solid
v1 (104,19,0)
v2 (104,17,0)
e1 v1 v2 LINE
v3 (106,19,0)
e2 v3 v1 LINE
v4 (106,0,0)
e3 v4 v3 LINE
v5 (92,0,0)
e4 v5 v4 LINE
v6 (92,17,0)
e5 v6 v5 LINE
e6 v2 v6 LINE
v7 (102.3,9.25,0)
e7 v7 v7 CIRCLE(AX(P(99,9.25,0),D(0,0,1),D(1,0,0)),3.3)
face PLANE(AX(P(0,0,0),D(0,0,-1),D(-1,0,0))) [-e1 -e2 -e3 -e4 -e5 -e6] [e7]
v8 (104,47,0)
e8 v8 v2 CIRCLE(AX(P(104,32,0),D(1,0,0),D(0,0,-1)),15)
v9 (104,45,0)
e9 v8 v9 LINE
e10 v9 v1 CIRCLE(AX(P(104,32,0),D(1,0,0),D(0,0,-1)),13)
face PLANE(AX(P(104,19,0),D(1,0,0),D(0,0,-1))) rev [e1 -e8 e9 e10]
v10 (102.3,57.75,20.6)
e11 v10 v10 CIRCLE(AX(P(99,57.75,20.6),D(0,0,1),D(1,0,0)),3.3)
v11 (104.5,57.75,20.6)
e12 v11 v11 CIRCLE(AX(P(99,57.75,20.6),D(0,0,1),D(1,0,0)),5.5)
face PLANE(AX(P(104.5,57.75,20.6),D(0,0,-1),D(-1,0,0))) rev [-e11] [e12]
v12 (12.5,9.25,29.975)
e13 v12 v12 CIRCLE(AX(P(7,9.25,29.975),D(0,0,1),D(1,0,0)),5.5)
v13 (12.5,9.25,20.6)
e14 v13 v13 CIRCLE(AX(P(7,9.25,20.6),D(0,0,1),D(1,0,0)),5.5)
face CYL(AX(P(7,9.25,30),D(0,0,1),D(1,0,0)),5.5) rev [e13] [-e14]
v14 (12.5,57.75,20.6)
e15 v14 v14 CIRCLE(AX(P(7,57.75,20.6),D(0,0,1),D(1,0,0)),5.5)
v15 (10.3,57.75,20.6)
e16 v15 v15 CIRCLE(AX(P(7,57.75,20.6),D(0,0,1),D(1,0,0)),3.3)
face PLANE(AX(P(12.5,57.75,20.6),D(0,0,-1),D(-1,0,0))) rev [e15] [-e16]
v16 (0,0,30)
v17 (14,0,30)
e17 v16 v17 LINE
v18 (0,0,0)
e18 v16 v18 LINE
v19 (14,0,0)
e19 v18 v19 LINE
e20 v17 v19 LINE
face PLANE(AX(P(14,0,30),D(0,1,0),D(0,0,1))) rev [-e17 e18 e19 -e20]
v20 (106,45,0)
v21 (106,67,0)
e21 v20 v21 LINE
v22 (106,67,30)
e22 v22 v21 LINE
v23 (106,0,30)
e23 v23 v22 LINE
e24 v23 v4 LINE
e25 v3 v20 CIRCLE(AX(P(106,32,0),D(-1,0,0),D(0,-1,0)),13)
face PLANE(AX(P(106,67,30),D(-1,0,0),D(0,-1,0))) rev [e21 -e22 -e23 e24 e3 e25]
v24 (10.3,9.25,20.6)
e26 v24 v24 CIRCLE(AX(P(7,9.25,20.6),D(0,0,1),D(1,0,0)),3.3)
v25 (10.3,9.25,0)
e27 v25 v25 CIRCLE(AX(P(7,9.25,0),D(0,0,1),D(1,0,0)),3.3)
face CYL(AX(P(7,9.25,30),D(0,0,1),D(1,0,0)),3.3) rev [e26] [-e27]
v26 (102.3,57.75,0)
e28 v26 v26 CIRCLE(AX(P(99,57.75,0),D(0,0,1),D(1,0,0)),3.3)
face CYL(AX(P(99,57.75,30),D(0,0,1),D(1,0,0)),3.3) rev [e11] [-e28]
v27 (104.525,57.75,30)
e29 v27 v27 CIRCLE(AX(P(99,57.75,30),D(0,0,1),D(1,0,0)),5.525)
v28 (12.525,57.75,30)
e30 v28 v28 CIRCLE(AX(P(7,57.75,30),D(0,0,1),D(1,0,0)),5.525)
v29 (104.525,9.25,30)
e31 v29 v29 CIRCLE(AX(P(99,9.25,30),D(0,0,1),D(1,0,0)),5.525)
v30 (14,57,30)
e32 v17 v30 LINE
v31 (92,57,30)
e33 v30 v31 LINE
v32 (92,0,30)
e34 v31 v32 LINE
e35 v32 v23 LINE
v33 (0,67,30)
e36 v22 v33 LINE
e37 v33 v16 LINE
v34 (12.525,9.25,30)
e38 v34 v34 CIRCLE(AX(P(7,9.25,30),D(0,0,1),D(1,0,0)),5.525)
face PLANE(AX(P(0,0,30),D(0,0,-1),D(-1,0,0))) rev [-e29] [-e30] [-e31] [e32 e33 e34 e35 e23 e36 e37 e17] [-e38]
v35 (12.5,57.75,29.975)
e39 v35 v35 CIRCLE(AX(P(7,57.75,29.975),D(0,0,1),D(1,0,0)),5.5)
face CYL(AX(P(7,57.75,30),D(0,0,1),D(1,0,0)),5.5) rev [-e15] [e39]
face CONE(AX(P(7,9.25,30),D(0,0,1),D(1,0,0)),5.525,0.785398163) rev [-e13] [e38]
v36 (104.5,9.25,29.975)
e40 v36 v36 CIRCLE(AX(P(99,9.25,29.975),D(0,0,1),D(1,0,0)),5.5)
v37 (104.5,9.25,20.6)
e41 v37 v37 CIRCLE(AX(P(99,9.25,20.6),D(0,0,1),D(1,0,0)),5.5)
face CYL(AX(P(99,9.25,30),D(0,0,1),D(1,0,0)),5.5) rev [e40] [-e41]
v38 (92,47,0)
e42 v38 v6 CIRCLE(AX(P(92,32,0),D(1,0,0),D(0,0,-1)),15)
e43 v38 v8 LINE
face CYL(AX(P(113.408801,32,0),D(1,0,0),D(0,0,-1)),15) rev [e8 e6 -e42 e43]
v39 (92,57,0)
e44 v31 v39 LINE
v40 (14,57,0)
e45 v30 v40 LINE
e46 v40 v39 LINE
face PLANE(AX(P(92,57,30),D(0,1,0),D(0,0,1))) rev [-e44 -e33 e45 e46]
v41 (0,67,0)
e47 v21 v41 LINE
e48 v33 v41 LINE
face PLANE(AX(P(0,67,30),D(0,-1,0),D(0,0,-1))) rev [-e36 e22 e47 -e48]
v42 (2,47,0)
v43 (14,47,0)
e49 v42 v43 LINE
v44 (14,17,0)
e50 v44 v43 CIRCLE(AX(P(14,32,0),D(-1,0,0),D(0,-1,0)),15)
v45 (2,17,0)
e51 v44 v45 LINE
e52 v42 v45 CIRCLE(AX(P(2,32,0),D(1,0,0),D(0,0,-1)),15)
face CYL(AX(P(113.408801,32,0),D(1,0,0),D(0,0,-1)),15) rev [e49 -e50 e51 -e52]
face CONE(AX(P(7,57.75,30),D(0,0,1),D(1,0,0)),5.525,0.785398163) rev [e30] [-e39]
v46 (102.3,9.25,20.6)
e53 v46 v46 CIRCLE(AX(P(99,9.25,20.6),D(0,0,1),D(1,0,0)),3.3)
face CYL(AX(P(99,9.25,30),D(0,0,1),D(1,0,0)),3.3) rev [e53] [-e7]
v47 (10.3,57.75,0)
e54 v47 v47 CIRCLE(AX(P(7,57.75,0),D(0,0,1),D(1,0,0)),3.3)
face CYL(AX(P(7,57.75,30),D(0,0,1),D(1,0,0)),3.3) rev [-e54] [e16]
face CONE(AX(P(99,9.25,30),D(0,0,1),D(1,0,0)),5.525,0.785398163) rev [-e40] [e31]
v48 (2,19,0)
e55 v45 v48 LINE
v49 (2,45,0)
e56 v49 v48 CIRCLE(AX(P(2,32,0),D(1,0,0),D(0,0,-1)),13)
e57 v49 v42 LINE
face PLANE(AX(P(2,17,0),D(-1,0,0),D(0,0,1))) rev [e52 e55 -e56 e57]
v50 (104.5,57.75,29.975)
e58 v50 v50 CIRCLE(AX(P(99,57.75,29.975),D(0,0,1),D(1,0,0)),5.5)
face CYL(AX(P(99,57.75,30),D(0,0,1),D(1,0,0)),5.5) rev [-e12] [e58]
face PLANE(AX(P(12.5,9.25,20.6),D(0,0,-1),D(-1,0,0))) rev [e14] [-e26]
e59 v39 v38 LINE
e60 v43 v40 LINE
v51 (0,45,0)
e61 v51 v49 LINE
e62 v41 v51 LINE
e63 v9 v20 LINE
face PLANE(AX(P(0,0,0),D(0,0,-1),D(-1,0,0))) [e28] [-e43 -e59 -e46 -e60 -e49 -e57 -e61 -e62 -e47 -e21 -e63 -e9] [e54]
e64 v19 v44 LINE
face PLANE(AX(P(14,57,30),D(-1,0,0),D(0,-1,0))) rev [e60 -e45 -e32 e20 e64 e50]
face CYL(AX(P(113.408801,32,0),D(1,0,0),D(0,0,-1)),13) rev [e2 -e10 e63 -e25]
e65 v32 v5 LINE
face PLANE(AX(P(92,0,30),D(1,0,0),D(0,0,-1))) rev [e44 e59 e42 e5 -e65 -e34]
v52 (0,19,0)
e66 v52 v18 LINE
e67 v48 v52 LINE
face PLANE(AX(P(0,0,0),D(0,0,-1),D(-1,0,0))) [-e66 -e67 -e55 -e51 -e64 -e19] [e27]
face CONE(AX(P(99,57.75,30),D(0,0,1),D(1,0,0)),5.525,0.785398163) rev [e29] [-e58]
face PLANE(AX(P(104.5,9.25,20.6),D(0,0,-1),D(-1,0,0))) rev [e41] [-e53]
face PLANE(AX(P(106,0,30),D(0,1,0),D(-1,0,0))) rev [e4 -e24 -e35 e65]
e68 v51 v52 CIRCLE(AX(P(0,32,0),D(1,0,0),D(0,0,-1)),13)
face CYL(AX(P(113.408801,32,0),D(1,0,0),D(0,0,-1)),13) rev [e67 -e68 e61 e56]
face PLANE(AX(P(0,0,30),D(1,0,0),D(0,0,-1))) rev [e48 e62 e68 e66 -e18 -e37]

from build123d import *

# Parameters (mm, degrees)
P_IDAT_VYSUNUT_M1_DEPTH = 30


# Read off the part's stored shape, not the designer's step: Válcové zahloubení pro M6 šrouby s vnitřním šestihranem1
with BuildPart() as part:
    # Skica1 → Přidat vysunutím1 (new body)
    with BuildSketch(Plane.XY):
        Polygon((0, 0), (0, 67), (106, 67), (106, 0), (92, 0), (92, 57), (14, 57), (14, 0), align=None)
    extrude(amount=P_IDAT_VYSUNUT_M1_DEPTH)

    # Skica2 → Odebrat rotací1 (revolve, cut)
    with BuildSketch(Plane(origin=(0, 0, 0), x_dir=(-1, 0, 0), z_dir=(0, 0, -1))):
        Polygon((-114, 32), (-114, 19), (-104, 19), (-104, 17), (-2, 17), (-2, 19), (8, 19), (8, 32), align=None)
    revolve(axis=Axis((113.408800735, 32, 0), (-1, 0, 0)), mode=Mode.SUBTRACT)

    # V_lcov_ zahlouben_ pro M6 _rouby s v 2 → Válcové zahloubení pro M6 šrouby s vnitřním šestihranem1 (revolve, cut)
    with BuildSketch(Plane(origin=(99, 9.25, 0), x_dir=(1, 0, 0), z_dir=(0, -1, 0))):
        Polygon((0, 0), (3.3, 0), (3.3, 20.6), (5.5, 20.6), (5.5, 29.975), (5.525, 30), (0, 30), align=None)
    revolve(axis=Axis((99, 9.25, 0), (0, 0, 1)), mode=Mode.SUBTRACT)

    # V_lcov_ zahlouben_ pro M6 _rouby s v 3 o → V_lcov_ zahlouben_ pro M6 _rouby s v 3 (revolve, cut)
    with BuildSketch(Plane(origin=(7, 57.75, 0), x_dir=(1, 0, 0), z_dir=(0, -1, 0))):
        Polygon((0, 30), (0, 0), (3.3, 0), (3.3, 20.6), (5.5, 20.6), (5.5, 29.975), (5.525, 30), align=None)
    revolve(axis=Axis((7, 57.75, 0), (0, 0, 1)), mode=Mode.SUBTRACT)

    # V_lcov_ zahlouben_ pro M6 _rouby s v 4 o → V_lcov_ zahlouben_ pro M6 _rouby s v 4 (revolve, cut)
    with BuildSketch(Plane(origin=(99, 57.75, 0), x_dir=(1, 0, 0), z_dir=(0, -1, 0))):
        Polygon((0, 30), (0, 0), (3.3, 0), (3.3, 20.6), (5.5, 20.6), (5.5, 29.975), (5.525, 30), align=None)
    revolve(axis=Axis((99, 57.75, 0), (0, 0, 1)), mode=Mode.SUBTRACT)

    # V_lcov_ zahlouben_ pro M6 _rouby s v 5 o → V_lcov_ zahlouben_ pro M6 _rouby s v 5 (revolve, cut)
    with BuildSketch(Plane(origin=(7, 9.25, 0), x_dir=(1, 0, 0), z_dir=(0, -1, 0))):
        Polygon((0, 30), (0, 0), (3.3, 0), (3.3, 20.6), (5.5, 20.6), (5.5, 29.975), (5.525, 30), align=None)
    revolve(axis=Axis((7, 9.25, 0), (0, 0, 1)), mode=Mode.SUBTRACT)


solid = part.part
